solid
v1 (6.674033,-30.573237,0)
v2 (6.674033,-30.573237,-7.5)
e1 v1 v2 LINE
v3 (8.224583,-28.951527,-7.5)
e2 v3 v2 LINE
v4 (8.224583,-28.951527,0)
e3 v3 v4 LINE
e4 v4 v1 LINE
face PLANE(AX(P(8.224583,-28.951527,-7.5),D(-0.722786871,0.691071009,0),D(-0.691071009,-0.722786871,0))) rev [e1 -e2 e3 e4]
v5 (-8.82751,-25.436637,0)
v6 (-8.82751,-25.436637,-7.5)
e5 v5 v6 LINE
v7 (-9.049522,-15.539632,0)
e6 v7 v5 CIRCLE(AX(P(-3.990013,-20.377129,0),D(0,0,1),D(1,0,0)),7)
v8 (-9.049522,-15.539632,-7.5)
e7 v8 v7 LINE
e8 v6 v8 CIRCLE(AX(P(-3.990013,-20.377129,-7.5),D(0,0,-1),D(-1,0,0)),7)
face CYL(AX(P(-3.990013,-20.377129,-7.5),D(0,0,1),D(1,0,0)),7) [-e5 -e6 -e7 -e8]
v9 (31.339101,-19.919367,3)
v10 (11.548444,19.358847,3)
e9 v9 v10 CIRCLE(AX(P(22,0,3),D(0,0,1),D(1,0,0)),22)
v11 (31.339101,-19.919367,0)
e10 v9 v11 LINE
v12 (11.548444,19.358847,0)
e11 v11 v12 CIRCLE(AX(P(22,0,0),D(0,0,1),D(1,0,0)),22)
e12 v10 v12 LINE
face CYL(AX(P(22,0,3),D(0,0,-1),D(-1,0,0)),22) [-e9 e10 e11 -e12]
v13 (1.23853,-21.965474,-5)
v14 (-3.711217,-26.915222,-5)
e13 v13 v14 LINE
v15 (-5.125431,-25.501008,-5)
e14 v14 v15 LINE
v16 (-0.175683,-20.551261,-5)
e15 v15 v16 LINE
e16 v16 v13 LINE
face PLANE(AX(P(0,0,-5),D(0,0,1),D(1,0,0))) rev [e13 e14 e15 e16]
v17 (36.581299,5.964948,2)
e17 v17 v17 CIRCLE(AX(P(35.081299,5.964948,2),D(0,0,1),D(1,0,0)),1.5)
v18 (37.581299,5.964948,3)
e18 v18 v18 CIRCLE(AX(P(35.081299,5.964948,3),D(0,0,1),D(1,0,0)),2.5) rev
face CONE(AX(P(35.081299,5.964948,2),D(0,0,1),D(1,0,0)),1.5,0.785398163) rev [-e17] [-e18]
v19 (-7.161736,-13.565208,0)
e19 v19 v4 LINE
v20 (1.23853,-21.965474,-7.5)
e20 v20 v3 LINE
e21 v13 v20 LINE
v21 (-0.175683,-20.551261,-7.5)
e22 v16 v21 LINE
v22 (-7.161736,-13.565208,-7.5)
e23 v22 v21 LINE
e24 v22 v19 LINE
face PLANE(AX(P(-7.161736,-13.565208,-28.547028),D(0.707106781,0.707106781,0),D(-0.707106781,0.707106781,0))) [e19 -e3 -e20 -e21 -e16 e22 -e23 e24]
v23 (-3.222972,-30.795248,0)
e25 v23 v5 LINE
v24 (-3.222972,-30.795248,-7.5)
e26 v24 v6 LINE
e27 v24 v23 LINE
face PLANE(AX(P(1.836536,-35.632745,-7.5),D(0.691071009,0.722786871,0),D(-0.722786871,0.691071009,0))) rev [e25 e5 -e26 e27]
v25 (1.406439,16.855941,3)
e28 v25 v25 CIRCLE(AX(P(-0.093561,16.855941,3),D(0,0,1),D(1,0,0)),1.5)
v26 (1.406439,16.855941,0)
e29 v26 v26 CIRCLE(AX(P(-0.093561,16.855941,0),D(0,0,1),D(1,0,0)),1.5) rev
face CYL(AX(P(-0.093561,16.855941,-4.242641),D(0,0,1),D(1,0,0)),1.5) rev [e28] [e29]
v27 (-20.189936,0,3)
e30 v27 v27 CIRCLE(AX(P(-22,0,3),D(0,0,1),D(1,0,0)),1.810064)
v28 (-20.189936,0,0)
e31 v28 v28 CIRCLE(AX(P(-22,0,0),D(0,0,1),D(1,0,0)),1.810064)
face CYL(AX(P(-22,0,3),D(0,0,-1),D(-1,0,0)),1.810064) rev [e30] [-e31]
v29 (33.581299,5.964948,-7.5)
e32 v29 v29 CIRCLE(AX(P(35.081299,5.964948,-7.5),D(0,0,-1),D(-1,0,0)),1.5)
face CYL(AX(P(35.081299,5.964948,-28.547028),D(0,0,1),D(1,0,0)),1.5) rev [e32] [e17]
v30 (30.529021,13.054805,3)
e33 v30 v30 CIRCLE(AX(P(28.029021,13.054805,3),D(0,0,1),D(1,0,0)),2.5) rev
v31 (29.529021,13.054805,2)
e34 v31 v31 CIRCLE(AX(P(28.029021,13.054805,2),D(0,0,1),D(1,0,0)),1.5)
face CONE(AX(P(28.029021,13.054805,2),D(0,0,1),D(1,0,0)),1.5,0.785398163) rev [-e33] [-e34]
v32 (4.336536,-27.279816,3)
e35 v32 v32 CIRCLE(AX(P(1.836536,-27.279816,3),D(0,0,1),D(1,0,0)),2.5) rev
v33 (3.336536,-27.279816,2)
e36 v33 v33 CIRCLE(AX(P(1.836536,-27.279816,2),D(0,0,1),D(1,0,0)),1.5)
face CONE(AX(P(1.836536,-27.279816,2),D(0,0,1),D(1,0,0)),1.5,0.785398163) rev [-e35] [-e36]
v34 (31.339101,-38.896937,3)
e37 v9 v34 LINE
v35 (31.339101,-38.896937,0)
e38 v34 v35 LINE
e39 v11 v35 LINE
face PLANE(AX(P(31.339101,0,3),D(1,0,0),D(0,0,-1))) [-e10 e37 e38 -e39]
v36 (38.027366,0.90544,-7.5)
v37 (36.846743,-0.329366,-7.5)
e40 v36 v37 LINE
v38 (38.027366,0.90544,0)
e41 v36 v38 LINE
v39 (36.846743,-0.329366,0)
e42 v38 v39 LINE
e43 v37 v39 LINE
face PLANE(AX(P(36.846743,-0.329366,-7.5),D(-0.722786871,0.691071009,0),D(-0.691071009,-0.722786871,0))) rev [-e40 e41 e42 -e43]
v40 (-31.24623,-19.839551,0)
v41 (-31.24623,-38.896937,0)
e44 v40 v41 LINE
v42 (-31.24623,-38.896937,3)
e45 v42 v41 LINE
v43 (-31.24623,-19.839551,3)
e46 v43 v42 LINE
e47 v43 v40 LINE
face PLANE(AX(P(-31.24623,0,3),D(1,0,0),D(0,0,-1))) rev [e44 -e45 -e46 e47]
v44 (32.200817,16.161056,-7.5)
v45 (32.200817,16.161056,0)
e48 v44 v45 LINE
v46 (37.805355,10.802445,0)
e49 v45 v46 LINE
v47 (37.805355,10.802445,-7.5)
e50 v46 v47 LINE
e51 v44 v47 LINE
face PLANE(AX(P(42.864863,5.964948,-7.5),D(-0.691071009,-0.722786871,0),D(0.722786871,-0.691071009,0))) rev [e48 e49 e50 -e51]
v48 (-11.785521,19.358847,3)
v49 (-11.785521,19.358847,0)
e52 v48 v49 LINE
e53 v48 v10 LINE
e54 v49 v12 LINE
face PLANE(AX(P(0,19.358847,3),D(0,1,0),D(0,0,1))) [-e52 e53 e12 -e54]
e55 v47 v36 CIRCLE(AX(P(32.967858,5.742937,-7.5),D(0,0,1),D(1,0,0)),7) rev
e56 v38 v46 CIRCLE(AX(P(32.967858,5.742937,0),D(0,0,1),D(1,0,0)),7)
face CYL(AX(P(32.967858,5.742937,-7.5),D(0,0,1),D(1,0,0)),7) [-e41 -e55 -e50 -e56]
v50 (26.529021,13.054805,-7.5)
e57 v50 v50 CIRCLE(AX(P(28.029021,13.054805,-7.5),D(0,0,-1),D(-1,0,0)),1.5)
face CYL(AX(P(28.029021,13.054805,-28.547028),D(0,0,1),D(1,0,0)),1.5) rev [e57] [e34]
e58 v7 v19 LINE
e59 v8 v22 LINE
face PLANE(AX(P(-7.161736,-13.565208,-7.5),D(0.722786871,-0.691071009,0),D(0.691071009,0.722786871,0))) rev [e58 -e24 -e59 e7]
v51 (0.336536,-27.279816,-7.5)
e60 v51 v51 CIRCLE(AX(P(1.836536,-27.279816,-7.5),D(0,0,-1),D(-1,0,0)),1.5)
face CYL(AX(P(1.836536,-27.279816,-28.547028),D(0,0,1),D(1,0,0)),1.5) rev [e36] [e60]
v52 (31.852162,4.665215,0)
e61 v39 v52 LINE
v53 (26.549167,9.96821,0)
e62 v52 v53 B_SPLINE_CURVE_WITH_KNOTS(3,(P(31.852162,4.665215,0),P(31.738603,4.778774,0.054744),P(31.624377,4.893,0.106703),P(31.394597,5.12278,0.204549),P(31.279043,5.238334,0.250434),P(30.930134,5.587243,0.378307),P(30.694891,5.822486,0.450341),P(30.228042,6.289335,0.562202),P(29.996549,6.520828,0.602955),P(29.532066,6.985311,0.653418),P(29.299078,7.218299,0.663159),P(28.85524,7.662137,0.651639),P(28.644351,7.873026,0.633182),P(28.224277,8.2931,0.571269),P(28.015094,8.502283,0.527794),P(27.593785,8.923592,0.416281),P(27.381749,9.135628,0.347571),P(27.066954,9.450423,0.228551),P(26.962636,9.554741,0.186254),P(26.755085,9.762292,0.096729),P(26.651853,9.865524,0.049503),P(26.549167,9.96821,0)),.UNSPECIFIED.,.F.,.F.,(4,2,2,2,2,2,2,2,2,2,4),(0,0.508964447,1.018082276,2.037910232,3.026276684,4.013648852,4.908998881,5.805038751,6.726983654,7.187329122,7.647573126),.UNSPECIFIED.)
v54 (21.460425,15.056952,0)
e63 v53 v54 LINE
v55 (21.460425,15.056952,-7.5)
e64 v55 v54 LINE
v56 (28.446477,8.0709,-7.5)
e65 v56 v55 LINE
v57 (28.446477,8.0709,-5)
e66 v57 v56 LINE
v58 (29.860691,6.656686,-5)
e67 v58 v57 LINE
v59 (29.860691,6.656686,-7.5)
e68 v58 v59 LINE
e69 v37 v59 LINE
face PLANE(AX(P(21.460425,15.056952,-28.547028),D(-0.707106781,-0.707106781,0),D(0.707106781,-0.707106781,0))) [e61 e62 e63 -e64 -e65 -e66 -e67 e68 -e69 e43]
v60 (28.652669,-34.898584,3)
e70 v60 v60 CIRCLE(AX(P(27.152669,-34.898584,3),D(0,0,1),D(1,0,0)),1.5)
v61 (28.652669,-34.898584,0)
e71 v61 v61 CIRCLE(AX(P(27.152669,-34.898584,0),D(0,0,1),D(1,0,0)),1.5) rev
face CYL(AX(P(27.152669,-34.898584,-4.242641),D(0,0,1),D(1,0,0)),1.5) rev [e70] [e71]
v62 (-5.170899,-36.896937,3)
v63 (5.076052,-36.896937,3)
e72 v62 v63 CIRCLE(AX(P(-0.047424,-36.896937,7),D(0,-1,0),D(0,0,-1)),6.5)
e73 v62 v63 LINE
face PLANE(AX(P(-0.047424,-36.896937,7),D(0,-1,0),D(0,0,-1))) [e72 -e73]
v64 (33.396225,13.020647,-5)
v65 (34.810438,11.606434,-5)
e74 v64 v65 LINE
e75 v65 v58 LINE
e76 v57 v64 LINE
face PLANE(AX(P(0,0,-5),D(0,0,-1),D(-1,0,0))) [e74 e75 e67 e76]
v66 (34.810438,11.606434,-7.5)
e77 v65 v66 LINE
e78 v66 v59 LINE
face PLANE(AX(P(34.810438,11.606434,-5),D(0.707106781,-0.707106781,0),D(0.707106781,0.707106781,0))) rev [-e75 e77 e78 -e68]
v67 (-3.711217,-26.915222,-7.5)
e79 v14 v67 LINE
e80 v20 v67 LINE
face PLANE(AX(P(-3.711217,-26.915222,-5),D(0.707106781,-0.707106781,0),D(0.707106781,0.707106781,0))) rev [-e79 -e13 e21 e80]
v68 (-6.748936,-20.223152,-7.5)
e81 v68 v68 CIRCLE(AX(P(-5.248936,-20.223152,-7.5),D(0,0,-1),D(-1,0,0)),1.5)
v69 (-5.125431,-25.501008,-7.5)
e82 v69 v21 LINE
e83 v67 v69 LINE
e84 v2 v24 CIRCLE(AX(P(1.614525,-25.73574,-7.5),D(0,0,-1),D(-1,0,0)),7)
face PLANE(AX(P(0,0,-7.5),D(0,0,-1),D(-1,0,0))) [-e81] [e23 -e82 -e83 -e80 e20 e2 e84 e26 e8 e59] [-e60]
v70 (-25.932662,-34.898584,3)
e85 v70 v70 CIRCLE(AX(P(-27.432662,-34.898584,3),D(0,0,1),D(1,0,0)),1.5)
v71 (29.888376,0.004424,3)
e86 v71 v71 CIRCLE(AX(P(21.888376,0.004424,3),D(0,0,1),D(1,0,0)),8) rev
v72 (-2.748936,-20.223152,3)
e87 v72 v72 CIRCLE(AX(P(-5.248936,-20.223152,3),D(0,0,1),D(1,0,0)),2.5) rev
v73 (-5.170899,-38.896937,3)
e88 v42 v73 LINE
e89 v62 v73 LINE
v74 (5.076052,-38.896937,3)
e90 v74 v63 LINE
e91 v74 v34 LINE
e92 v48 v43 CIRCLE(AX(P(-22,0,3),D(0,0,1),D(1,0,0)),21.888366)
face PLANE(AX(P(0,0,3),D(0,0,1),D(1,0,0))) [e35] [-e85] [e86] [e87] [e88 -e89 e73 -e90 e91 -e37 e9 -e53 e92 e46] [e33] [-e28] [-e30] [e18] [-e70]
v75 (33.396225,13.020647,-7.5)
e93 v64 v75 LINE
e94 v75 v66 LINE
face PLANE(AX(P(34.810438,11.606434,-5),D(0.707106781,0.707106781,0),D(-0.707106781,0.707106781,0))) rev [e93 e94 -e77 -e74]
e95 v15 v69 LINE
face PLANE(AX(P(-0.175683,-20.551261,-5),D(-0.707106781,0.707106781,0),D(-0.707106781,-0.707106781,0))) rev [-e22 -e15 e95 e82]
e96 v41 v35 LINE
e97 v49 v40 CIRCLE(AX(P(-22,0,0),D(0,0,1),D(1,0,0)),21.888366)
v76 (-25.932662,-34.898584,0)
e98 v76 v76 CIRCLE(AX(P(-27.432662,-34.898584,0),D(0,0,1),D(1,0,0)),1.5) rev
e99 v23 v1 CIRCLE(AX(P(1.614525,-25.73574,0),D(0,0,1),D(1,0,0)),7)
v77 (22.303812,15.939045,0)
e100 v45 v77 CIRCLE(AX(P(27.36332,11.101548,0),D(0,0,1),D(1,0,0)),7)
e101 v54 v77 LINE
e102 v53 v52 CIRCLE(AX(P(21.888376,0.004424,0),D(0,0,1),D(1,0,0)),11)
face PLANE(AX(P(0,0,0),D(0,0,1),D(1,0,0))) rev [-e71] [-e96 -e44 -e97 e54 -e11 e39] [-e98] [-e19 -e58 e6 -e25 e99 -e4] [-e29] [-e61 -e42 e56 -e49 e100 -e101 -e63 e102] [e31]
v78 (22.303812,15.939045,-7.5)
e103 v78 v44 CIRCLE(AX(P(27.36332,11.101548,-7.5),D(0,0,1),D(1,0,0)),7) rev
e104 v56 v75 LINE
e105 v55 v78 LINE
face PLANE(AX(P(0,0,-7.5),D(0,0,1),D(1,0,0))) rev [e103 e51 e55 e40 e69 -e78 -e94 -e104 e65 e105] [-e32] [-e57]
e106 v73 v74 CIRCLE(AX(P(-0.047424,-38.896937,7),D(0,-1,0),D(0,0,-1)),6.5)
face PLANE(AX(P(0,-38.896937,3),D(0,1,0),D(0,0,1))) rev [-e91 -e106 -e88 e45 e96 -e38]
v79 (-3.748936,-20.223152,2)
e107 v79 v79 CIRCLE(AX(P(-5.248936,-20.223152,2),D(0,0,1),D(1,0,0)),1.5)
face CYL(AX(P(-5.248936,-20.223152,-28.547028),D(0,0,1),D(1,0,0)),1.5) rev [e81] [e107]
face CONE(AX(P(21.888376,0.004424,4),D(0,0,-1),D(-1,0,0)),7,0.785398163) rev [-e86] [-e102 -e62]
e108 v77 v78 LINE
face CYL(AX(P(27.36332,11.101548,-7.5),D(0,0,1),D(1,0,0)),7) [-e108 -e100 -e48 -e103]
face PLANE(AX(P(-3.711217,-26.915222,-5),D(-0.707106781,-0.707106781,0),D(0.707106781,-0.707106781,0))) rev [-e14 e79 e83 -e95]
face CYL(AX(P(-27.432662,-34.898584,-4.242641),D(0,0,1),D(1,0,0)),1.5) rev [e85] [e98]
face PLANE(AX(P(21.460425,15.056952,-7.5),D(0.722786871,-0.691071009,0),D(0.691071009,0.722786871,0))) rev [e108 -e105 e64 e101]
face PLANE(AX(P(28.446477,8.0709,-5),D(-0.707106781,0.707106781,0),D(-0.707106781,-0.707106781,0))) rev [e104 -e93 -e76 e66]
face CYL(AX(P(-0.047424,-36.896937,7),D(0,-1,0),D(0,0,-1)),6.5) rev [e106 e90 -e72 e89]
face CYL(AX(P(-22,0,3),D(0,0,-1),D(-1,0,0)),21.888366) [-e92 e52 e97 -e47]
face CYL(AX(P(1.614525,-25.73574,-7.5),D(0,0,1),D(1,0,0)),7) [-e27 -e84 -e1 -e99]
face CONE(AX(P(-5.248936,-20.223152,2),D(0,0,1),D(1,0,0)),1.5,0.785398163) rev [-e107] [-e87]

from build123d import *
from build123d.topology import SkipClean

# Parameters (mm, degrees)
CROQUIS1_R                          = 1.810063523
BASE_SOPORTE_DEPTH                  = 3
CAJEADO_SERVO_DEPTH                 = 3
SOPORTES_START                      = 11
SOPORTES_DEL_SERVO_DEPTH            = 11
SOPORTES_START_2                    = 3
CROQUIS4_R                          = 1.5
SOPORTES_TALADROS_SERVO_DEPTH       = 3
CROQUIS5_R                          = 1.5
TALADROS_TAPA_DEPTH                 = 3
RECTIFICACION_START                 = -3
CROQUIS6_R                          = 1.5
RECTIFICACION_TALADROS_SERVOS_DEPTH = 3
CROQUIS7_W                          = 24.98953617
CROQUIS7_H                          = 91.552769595
SUPRIMIR_SOPORTE_SERVO_DEPTH        = 27.15954006
RECTIFICACI_N_START                 = 7.5
CROQUIS8_R                          = 1.5
RECTIFICACI_N_SOPORTE_SERVO_DEPTH   = 7.5
REDONDEO_SOPORTE_SERVO_R            = 7
RECTIF_CAJA_SOPORTE_SERVO_DEPTH     = 2.5
RECTIFICACI_N_HUECO_SERVO_DEPTH     = 3
CHAFL_N_HUECO_SERVO_SIZE            = 4
CHAFL_N_TALADROS_SERVO_SIZE         = 1
CROQUIS11_R                         = 6.5
CAJA_SERVO_EXTERIOR_DEPTH           = 2


with BuildPart() as part:
    # Croquis1 → Base Soporte (new body)
    with BuildSketch(Plane.XY):
        with BuildLine():
            Line((11.548443784, 19.3588474), (-11.785521088, 19.3588474))
            ThreePointArc((-11.785521088, 19.3588474), (-41.605177571, 9.733322379), (-31.246229762, -19.839551086))
            Line((-31.246229762, -19.839551086), (-31.246229762, -38.896936565))
            Line((-31.246229762, -38.896936565), (31.339101257, -38.896936565))
            Line((31.339101257, -38.896936565), (31.339101257, -19.919367151))
            ThreePointArc((31.339101257, -19.919367151), (41.646982557, 9.899296763), (11.548443784, 19.3588474))
        make_face()
        with Locations((-22, 0)):
            Circle(CROQUIS1_R, mode=Mode.SUBTRACT)
        with Locations((22, 0)):
            Circle(CROQUIS1_R, mode=Mode.SUBTRACT)
    extrude(amount=BASE_SOPORTE_DEPTH)

    # Croquis2 → Cajeado Servo (cut)
    with BuildSketch(Plane.XY.offset(3)):
        Polygon((-11.961214469, -18.364687339), (3.425103863, -33.751005671), (41.608870047, 4.432760513), (26.222551715, 19.819078845), align=None)
    extrude(amount=-CAJEADO_SERVO_DEPTH, mode=Mode.SUBTRACT)

    # Croquis3 → Soportes del Servo (add)
    with SkipClean():  # the faces are left unmerged after this step: merging them gives an invalid solid
        with BuildSketch(Plane(origin=(0, 0, 0), x_dir=(-1, 0, 0), z_dir=(0, 0, -1)).offset(SOPORTES_START)):
            with BuildLine():
                Line((-41.608870047, 4.432760513), (-26.222551715, 19.819078845))
                Line((-26.222551715, 19.819078845), (-21.626357638, 15.222884767))
                Line((-21.626357638, 15.222884767), (-19.717169328, 17.132073076))
                Line((-19.717169328, 17.132073076), (-24.448426462, 21.86333021))
                ThreePointArc((-24.448426462, 21.86333021), (-26.753551475, 21.480310714), (-29.005048716, 20.854958463))
                Line((-29.005048716, 20.854958463), (-42.854958463, 7.005048716))
                ThreePointArc((-42.854958463, 7.005048716), (-43.438696033, 4.937844916), (-43.818053681, 2.823567528))
                Line((-43.818053681, 2.823567528), (-38.921864279, -2.072621874))
                Line((-38.921864279, -2.072621874), (-37.01267597, -0.163433565))
                Line((-37.01267597, -0.163433565), (-41.608870047, 4.432760513))
            make_face()
            Polygon((9.2742087, -11.859304952), (7.365020391, -13.768493261), (11.961214469, -18.364687339), (-3.425103863, -33.751005671), (-8.021297941, -29.154811594), (-9.93048625, -31.063999903), (-3.425103863, -37.56938229), (15.779591087, -18.364687339), align=None)
        extrude(amount=-SOPORTES_DEL_SERVO_DEPTH)

    # Croquis4 → Soportes Taladros servo (add)
    # profile 1 of 2: a face of its own
    with SkipClean():  # the faces are left unmerged after this step: merging them gives an invalid solid
        with BuildSketch(Plane(origin=(0, 0, -11), x_dir=(-1, 0, 0), z_dir=(0, 0, -1)).offset(SOPORTES_START_2)):
            with BuildLine():
                Line((-34.001825112, 8.729393743), (-30.752863076, 11.811206448))
                ThreePointArc((-30.752863076, 11.811206448), (-28.560820678, 10.108105277), (-25.911729157, 10.937513248))
                Line((-25.911729157, 10.937513248), (-19.717169328, 17.132073076))
                Line((-19.717169328, 17.132073076), (-24.448426462, 21.86333021))
                ThreePointArc((-24.448426462, 21.86333021), (-26.753551475, 21.480310714), (-29.005048716, 20.854958463))
                Line((-29.005048716, 20.854958463), (-42.854958463, 7.005048716))
                ThreePointArc((-42.854958463, 7.005048716), (-43.438696033, 4.937844916), (-43.818053681, 2.823567528))
                Line((-43.818053681, 2.823567528), (-38.921864279, -2.072621874))
                Line((-38.921864279, -2.072621874), (-32.982796969, 3.866445436))
                ThreePointArc((-32.982796969, 3.866445436), (-32.176656499, 6.573614275), (-34.001825112, 8.729393743))
            make_face()
            with Locations((-35.081299471, 5.964947938)):
                Circle(CROQUIS4_R, mode=Mode.SUBTRACT)
            with Locations((-28.029021327, 13.054805418)):
                Circle(CROQUIS4_R, mode=Mode.SUBTRACT)
        # profile 2 of 2: a face of its own
        with BuildSketch(Plane(origin=(0, 0, -11), x_dir=(-1, 0, 0), z_dir=(0, 0, -1)).offset(SOPORTES_START_2)):
            Polygon((-9.93048625, -31.063999903), (9.2742087, -11.859304952), (15.779591087, -18.364687339), (-3.425103863, -37.56938229), align=None)
            with Locations((-1.836535735, -27.279815798)):
                Circle(CROQUIS4_R, mode=Mode.SUBTRACT)
            with Locations((5.248935605, -20.223151514)):
                Circle(CROQUIS4_R, mode=Mode.SUBTRACT)
        extrude(amount=-SOPORTES_TALADROS_SERVO_DEPTH)

    # Croquis5 → Taladros tapa (cut)
    with SkipClean():  # the faces are left unmerged after this step: merging them gives an invalid solid
        with BuildSketch(Plane.XY.offset(3)):
            with Locations((-0.093560971, 16.855940523)):
                Circle(CROQUIS5_R)
            with Locations((-27.432662228, -34.898583993)):
                Circle(CROQUIS5_R)
            with Locations((27.152668791, -34.898583993)):
                Circle(CROQUIS5_R)
        extrude(amount=-TALADROS_TAPA_DEPTH, mode=Mode.SUBTRACT)

    # Croquis6 → Rectificacion Taladros Servos (add)
    # profile 1 of 2: a face of its own
    with SkipClean():  # the faces are left unmerged after this step: merging them gives an invalid solid
        with BuildSketch(Plane.XY.offset(3).offset(RECTIFICACION_START)):
            Polygon((-7.161735598, -13.565208469), (-11.961214469, -18.364687339), (3.425103863, -33.751005671), (8.224582734, -28.951526801), align=None)
            with Locations(Location((-5.248935605, -20.223151514, 0), (0, 0, 180))):
                Circle(CROQUIS6_R, mode=Mode.SUBTRACT)
            with Locations(Location((1.836535735, -27.279815798, 0), (0, 0, 180))):
                Circle(CROQUIS6_R, mode=Mode.SUBTRACT)
        # profile 2 of 2: a face of its own
        with BuildSketch(Plane.XY.offset(3).offset(RECTIFICACION_START)):
            Polygon((26.222551715, 19.819078845), (21.460424994, 15.056952123), (36.846743326, -0.329366209), (41.608870047, 4.432760513), align=None)
            with Locations(Location((35.081299471, 5.964947938, 0), (0, 0, 180))):
                Circle(CROQUIS6_R, mode=Mode.SUBTRACT)
            with Locations(Location((28.029021327, 13.054805418, 0), (0, 0, 180))):
                Circle(CROQUIS6_R, mode=Mode.SUBTRACT)
        extrude(amount=RECTIFICACION_TALADROS_SERVOS_DEPTH)

    # Croquis7 → Suprimir soporte servo (cut)
    with BuildSketch(Plane(origin=(20.497243077, -20.497243077, 0), x_dir=(0, 0, -1), z_dir=(0.7071067811865521, -0.7071067811865429, 0))):
        with Locations((12.494768085, -3.822323765)):
            Rectangle(CROQUIS7_W, CROQUIS7_H)
    extrude(amount=-SUPRIMIR_SOPORTE_SERVO_DEPTH, mode=Mode.SUBTRACT)

    # Croquis8 → Rectificación Soporte servo (add)
    # profile 1 of 2: a face of its own
    with SkipClean():  # the faces are left unmerged after this step: merging them gives an invalid solid
        with BuildSketch(Plane(origin=(0, 0, 0), x_dir=(-1, 0, 0), z_dir=(0, 0, -1)).offset(RECTIFICACI_N_START)):
            Polygon((-42.864863197, 5.964947938), (-27.141308886, 20.998553257), (-21.460424994, 15.056952123), (-36.846743326, -0.329366209), align=None)
            with Locations(Location((-35.081299471, 5.964947938, 0), (0, 0, 180))):
                Circle(CROQUIS8_R, mode=Mode.SUBTRACT)
            with Locations(Location((-28.029021327, 13.054805418, 0), (0, 0, 180))):
                Circle(CROQUIS8_R, mode=Mode.SUBTRACT)
        # profile 2 of 2: a face of its own
        with BuildSketch(Plane(origin=(0, 0, 0), x_dir=(-1, 0, 0), z_dir=(0, 0, -1)).offset(RECTIFICACI_N_START)):
            Polygon((7.161735598, -13.565208469), (-8.224582734, -28.951526801), (-1.836535735, -35.63274543), (13.887018575, -20.59914011), align=None)
            with Locations(Location((-1.836535735, -27.279815798, 0), (0, 0, 180))):
                Circle(CROQUIS8_R, mode=Mode.SUBTRACT)
            with Locations(Location((5.248935605, -20.223151514, 0), (0, 0, 180))):
                Circle(CROQUIS8_R, mode=Mode.SUBTRACT)
        extrude(amount=-RECTIFICACI_N_SOPORTE_SERVO_DEPTH)

    # Redondeo soporte servo
    redondeo_soporte_servo_edges = [part.edges().sort_by_distance(p)[0] for p in [
        (-13.887018575, -20.59914011, -3.75),
        (1.836535735, -35.63274543, -3.75),
        (42.864863197, 5.964947938, -3.75),
        (27.141308886, 20.998553257, -3.75),
    ]]
    fillet(redondeo_soporte_servo_edges, radius=REDONDEO_SOPORTE_SERVO_R)

    # Croquis9 → Rectif caja soporte servo (cut)
    with BuildSketch(Plane(origin=(0, 0, -7.5), x_dir=(-1, 0, 0), z_dir=(0, 0, -1))):
        Polygon((-34.810438409, 11.606433644), (-33.396224847, 13.020647207), (-28.446477378, 8.070899738), (-29.860690941, 6.656686176), align=None)
        Polygon((0.175683213, -20.551260854), (5.125430682, -25.501008322), (3.711217119, -26.915221884), (-1.238530349, -21.965474416), align=None)
    extrude(amount=-RECTIF_CAJA_SOPORTE_SERVO_DEPTH, mode=Mode.SUBTRACT)

    # Croquis10 → Rectificación  hueco servo (add)
    with SkipClean():  # the faces are left unmerged after this step: merging them gives an invalid solid
        with BuildSketch(Plane.XY.offset(3)):
            with BuildLine():
                Line((14.888375897, 0.004424428), (6.407897299, 0.004424428))
                Line((6.407897299, 0.004424428), (-7.161735598, -13.565208469))
                Line((-7.161735598, -13.565208469), (8.224582734, -28.951526801))
                Line((8.224582734, -28.951526801), (36.846743326, -0.329366209))
                Line((36.846743326, -0.329366209), (36.512952689, 0.004424428))
                Line((36.512952689, 0.004424428), (28.888375897, 0.004424428))
                ThreePointArc((28.888375897, 0.004424428), (21.888375897, -6.995575572), (14.888375897, 0.004424428))
            make_face()
            with BuildLine():
                Line((21.460424994, 15.056952123), (6.407897299, 0.004424428))
                Line((6.407897299, 0.004424428), (14.888375897, 0.004424428))
                ThreePointArc((14.888375897, 0.004424428), (21.888375897, 7.004424428), (28.888375897, 0.004424428))
                Line((28.888375897, 0.004424428), (36.512952689, 0.004424428))
                Line((36.512952689, 0.004424428), (21.460424994, 15.056952123))
            make_face()
        extrude(amount=-RECTIFICACI_N_HUECO_SERVO_DEPTH)
    add(part.part.scale(1), mode=Mode.REPLACE)  # the faces are merged on a copy

    # Chaflán hueco servo
    # the kernel refuses this chamfer: 4 mm, written as the material it takes off along each edge
    with BuildSketch(Plane(origin=(21.888375897, 0.004424428, 0), x_dir=(1, 0, 0), z_dir=(0, 1, 0))) as chafl_n_hueco_servo_piece_1_section:
        Polygon((7 + CHAFL_N_HUECO_SERVO_SIZE, 0), (7, -CHAFL_N_HUECO_SERVO_SIZE), (7, 0), align=None)
    chafl_n_hueco_servo_piece_1 = revolve(axis=Axis((21.888375897, 0.004424428, 0), (0, 0, -1)), mode=Mode.PRIVATE)
    chafl_n_hueco_servo_piece_1 = split(chafl_n_hueco_servo_piece_1, bisect_by=Plane(origin=(24.727929701, 11.789447416, 1.945469183), z_dir=(-0.7071067811865429, -0.7071067811865521, 0)), keep=Keep.TOP, mode=Mode.PRIVATE)
    add(chafl_n_hueco_servo_piece_1, mode=Mode.SUBTRACT)

    # Chaflán Taladros servo
    chafl_n_taladros_servo_edges = [part.edges().sort_by_distance(p)[0] for p in [
        (36.581299471, 5.964947938, 3),
        (29.529021327, 13.054805418, 3),
        (-3.748935605, -20.223151514, 3),
        (3.336535735, -27.279815798, 3),
    ]]
    chamfer(chafl_n_taladros_servo_edges, length=CHAFL_N_TALADROS_SERVO_SIZE)

    # Croquis11 → Caja servo exterior (cut)
    with BuildSketch(Plane.XZ.offset(38.896936565)):
        with Locations((-0.047423734, 7)):
            Circle(CROQUIS11_R)
    extrude(amount=-CAJA_SERVO_EXTERIOR_DEPTH, mode=Mode.SUBTRACT)


solid = part.part
